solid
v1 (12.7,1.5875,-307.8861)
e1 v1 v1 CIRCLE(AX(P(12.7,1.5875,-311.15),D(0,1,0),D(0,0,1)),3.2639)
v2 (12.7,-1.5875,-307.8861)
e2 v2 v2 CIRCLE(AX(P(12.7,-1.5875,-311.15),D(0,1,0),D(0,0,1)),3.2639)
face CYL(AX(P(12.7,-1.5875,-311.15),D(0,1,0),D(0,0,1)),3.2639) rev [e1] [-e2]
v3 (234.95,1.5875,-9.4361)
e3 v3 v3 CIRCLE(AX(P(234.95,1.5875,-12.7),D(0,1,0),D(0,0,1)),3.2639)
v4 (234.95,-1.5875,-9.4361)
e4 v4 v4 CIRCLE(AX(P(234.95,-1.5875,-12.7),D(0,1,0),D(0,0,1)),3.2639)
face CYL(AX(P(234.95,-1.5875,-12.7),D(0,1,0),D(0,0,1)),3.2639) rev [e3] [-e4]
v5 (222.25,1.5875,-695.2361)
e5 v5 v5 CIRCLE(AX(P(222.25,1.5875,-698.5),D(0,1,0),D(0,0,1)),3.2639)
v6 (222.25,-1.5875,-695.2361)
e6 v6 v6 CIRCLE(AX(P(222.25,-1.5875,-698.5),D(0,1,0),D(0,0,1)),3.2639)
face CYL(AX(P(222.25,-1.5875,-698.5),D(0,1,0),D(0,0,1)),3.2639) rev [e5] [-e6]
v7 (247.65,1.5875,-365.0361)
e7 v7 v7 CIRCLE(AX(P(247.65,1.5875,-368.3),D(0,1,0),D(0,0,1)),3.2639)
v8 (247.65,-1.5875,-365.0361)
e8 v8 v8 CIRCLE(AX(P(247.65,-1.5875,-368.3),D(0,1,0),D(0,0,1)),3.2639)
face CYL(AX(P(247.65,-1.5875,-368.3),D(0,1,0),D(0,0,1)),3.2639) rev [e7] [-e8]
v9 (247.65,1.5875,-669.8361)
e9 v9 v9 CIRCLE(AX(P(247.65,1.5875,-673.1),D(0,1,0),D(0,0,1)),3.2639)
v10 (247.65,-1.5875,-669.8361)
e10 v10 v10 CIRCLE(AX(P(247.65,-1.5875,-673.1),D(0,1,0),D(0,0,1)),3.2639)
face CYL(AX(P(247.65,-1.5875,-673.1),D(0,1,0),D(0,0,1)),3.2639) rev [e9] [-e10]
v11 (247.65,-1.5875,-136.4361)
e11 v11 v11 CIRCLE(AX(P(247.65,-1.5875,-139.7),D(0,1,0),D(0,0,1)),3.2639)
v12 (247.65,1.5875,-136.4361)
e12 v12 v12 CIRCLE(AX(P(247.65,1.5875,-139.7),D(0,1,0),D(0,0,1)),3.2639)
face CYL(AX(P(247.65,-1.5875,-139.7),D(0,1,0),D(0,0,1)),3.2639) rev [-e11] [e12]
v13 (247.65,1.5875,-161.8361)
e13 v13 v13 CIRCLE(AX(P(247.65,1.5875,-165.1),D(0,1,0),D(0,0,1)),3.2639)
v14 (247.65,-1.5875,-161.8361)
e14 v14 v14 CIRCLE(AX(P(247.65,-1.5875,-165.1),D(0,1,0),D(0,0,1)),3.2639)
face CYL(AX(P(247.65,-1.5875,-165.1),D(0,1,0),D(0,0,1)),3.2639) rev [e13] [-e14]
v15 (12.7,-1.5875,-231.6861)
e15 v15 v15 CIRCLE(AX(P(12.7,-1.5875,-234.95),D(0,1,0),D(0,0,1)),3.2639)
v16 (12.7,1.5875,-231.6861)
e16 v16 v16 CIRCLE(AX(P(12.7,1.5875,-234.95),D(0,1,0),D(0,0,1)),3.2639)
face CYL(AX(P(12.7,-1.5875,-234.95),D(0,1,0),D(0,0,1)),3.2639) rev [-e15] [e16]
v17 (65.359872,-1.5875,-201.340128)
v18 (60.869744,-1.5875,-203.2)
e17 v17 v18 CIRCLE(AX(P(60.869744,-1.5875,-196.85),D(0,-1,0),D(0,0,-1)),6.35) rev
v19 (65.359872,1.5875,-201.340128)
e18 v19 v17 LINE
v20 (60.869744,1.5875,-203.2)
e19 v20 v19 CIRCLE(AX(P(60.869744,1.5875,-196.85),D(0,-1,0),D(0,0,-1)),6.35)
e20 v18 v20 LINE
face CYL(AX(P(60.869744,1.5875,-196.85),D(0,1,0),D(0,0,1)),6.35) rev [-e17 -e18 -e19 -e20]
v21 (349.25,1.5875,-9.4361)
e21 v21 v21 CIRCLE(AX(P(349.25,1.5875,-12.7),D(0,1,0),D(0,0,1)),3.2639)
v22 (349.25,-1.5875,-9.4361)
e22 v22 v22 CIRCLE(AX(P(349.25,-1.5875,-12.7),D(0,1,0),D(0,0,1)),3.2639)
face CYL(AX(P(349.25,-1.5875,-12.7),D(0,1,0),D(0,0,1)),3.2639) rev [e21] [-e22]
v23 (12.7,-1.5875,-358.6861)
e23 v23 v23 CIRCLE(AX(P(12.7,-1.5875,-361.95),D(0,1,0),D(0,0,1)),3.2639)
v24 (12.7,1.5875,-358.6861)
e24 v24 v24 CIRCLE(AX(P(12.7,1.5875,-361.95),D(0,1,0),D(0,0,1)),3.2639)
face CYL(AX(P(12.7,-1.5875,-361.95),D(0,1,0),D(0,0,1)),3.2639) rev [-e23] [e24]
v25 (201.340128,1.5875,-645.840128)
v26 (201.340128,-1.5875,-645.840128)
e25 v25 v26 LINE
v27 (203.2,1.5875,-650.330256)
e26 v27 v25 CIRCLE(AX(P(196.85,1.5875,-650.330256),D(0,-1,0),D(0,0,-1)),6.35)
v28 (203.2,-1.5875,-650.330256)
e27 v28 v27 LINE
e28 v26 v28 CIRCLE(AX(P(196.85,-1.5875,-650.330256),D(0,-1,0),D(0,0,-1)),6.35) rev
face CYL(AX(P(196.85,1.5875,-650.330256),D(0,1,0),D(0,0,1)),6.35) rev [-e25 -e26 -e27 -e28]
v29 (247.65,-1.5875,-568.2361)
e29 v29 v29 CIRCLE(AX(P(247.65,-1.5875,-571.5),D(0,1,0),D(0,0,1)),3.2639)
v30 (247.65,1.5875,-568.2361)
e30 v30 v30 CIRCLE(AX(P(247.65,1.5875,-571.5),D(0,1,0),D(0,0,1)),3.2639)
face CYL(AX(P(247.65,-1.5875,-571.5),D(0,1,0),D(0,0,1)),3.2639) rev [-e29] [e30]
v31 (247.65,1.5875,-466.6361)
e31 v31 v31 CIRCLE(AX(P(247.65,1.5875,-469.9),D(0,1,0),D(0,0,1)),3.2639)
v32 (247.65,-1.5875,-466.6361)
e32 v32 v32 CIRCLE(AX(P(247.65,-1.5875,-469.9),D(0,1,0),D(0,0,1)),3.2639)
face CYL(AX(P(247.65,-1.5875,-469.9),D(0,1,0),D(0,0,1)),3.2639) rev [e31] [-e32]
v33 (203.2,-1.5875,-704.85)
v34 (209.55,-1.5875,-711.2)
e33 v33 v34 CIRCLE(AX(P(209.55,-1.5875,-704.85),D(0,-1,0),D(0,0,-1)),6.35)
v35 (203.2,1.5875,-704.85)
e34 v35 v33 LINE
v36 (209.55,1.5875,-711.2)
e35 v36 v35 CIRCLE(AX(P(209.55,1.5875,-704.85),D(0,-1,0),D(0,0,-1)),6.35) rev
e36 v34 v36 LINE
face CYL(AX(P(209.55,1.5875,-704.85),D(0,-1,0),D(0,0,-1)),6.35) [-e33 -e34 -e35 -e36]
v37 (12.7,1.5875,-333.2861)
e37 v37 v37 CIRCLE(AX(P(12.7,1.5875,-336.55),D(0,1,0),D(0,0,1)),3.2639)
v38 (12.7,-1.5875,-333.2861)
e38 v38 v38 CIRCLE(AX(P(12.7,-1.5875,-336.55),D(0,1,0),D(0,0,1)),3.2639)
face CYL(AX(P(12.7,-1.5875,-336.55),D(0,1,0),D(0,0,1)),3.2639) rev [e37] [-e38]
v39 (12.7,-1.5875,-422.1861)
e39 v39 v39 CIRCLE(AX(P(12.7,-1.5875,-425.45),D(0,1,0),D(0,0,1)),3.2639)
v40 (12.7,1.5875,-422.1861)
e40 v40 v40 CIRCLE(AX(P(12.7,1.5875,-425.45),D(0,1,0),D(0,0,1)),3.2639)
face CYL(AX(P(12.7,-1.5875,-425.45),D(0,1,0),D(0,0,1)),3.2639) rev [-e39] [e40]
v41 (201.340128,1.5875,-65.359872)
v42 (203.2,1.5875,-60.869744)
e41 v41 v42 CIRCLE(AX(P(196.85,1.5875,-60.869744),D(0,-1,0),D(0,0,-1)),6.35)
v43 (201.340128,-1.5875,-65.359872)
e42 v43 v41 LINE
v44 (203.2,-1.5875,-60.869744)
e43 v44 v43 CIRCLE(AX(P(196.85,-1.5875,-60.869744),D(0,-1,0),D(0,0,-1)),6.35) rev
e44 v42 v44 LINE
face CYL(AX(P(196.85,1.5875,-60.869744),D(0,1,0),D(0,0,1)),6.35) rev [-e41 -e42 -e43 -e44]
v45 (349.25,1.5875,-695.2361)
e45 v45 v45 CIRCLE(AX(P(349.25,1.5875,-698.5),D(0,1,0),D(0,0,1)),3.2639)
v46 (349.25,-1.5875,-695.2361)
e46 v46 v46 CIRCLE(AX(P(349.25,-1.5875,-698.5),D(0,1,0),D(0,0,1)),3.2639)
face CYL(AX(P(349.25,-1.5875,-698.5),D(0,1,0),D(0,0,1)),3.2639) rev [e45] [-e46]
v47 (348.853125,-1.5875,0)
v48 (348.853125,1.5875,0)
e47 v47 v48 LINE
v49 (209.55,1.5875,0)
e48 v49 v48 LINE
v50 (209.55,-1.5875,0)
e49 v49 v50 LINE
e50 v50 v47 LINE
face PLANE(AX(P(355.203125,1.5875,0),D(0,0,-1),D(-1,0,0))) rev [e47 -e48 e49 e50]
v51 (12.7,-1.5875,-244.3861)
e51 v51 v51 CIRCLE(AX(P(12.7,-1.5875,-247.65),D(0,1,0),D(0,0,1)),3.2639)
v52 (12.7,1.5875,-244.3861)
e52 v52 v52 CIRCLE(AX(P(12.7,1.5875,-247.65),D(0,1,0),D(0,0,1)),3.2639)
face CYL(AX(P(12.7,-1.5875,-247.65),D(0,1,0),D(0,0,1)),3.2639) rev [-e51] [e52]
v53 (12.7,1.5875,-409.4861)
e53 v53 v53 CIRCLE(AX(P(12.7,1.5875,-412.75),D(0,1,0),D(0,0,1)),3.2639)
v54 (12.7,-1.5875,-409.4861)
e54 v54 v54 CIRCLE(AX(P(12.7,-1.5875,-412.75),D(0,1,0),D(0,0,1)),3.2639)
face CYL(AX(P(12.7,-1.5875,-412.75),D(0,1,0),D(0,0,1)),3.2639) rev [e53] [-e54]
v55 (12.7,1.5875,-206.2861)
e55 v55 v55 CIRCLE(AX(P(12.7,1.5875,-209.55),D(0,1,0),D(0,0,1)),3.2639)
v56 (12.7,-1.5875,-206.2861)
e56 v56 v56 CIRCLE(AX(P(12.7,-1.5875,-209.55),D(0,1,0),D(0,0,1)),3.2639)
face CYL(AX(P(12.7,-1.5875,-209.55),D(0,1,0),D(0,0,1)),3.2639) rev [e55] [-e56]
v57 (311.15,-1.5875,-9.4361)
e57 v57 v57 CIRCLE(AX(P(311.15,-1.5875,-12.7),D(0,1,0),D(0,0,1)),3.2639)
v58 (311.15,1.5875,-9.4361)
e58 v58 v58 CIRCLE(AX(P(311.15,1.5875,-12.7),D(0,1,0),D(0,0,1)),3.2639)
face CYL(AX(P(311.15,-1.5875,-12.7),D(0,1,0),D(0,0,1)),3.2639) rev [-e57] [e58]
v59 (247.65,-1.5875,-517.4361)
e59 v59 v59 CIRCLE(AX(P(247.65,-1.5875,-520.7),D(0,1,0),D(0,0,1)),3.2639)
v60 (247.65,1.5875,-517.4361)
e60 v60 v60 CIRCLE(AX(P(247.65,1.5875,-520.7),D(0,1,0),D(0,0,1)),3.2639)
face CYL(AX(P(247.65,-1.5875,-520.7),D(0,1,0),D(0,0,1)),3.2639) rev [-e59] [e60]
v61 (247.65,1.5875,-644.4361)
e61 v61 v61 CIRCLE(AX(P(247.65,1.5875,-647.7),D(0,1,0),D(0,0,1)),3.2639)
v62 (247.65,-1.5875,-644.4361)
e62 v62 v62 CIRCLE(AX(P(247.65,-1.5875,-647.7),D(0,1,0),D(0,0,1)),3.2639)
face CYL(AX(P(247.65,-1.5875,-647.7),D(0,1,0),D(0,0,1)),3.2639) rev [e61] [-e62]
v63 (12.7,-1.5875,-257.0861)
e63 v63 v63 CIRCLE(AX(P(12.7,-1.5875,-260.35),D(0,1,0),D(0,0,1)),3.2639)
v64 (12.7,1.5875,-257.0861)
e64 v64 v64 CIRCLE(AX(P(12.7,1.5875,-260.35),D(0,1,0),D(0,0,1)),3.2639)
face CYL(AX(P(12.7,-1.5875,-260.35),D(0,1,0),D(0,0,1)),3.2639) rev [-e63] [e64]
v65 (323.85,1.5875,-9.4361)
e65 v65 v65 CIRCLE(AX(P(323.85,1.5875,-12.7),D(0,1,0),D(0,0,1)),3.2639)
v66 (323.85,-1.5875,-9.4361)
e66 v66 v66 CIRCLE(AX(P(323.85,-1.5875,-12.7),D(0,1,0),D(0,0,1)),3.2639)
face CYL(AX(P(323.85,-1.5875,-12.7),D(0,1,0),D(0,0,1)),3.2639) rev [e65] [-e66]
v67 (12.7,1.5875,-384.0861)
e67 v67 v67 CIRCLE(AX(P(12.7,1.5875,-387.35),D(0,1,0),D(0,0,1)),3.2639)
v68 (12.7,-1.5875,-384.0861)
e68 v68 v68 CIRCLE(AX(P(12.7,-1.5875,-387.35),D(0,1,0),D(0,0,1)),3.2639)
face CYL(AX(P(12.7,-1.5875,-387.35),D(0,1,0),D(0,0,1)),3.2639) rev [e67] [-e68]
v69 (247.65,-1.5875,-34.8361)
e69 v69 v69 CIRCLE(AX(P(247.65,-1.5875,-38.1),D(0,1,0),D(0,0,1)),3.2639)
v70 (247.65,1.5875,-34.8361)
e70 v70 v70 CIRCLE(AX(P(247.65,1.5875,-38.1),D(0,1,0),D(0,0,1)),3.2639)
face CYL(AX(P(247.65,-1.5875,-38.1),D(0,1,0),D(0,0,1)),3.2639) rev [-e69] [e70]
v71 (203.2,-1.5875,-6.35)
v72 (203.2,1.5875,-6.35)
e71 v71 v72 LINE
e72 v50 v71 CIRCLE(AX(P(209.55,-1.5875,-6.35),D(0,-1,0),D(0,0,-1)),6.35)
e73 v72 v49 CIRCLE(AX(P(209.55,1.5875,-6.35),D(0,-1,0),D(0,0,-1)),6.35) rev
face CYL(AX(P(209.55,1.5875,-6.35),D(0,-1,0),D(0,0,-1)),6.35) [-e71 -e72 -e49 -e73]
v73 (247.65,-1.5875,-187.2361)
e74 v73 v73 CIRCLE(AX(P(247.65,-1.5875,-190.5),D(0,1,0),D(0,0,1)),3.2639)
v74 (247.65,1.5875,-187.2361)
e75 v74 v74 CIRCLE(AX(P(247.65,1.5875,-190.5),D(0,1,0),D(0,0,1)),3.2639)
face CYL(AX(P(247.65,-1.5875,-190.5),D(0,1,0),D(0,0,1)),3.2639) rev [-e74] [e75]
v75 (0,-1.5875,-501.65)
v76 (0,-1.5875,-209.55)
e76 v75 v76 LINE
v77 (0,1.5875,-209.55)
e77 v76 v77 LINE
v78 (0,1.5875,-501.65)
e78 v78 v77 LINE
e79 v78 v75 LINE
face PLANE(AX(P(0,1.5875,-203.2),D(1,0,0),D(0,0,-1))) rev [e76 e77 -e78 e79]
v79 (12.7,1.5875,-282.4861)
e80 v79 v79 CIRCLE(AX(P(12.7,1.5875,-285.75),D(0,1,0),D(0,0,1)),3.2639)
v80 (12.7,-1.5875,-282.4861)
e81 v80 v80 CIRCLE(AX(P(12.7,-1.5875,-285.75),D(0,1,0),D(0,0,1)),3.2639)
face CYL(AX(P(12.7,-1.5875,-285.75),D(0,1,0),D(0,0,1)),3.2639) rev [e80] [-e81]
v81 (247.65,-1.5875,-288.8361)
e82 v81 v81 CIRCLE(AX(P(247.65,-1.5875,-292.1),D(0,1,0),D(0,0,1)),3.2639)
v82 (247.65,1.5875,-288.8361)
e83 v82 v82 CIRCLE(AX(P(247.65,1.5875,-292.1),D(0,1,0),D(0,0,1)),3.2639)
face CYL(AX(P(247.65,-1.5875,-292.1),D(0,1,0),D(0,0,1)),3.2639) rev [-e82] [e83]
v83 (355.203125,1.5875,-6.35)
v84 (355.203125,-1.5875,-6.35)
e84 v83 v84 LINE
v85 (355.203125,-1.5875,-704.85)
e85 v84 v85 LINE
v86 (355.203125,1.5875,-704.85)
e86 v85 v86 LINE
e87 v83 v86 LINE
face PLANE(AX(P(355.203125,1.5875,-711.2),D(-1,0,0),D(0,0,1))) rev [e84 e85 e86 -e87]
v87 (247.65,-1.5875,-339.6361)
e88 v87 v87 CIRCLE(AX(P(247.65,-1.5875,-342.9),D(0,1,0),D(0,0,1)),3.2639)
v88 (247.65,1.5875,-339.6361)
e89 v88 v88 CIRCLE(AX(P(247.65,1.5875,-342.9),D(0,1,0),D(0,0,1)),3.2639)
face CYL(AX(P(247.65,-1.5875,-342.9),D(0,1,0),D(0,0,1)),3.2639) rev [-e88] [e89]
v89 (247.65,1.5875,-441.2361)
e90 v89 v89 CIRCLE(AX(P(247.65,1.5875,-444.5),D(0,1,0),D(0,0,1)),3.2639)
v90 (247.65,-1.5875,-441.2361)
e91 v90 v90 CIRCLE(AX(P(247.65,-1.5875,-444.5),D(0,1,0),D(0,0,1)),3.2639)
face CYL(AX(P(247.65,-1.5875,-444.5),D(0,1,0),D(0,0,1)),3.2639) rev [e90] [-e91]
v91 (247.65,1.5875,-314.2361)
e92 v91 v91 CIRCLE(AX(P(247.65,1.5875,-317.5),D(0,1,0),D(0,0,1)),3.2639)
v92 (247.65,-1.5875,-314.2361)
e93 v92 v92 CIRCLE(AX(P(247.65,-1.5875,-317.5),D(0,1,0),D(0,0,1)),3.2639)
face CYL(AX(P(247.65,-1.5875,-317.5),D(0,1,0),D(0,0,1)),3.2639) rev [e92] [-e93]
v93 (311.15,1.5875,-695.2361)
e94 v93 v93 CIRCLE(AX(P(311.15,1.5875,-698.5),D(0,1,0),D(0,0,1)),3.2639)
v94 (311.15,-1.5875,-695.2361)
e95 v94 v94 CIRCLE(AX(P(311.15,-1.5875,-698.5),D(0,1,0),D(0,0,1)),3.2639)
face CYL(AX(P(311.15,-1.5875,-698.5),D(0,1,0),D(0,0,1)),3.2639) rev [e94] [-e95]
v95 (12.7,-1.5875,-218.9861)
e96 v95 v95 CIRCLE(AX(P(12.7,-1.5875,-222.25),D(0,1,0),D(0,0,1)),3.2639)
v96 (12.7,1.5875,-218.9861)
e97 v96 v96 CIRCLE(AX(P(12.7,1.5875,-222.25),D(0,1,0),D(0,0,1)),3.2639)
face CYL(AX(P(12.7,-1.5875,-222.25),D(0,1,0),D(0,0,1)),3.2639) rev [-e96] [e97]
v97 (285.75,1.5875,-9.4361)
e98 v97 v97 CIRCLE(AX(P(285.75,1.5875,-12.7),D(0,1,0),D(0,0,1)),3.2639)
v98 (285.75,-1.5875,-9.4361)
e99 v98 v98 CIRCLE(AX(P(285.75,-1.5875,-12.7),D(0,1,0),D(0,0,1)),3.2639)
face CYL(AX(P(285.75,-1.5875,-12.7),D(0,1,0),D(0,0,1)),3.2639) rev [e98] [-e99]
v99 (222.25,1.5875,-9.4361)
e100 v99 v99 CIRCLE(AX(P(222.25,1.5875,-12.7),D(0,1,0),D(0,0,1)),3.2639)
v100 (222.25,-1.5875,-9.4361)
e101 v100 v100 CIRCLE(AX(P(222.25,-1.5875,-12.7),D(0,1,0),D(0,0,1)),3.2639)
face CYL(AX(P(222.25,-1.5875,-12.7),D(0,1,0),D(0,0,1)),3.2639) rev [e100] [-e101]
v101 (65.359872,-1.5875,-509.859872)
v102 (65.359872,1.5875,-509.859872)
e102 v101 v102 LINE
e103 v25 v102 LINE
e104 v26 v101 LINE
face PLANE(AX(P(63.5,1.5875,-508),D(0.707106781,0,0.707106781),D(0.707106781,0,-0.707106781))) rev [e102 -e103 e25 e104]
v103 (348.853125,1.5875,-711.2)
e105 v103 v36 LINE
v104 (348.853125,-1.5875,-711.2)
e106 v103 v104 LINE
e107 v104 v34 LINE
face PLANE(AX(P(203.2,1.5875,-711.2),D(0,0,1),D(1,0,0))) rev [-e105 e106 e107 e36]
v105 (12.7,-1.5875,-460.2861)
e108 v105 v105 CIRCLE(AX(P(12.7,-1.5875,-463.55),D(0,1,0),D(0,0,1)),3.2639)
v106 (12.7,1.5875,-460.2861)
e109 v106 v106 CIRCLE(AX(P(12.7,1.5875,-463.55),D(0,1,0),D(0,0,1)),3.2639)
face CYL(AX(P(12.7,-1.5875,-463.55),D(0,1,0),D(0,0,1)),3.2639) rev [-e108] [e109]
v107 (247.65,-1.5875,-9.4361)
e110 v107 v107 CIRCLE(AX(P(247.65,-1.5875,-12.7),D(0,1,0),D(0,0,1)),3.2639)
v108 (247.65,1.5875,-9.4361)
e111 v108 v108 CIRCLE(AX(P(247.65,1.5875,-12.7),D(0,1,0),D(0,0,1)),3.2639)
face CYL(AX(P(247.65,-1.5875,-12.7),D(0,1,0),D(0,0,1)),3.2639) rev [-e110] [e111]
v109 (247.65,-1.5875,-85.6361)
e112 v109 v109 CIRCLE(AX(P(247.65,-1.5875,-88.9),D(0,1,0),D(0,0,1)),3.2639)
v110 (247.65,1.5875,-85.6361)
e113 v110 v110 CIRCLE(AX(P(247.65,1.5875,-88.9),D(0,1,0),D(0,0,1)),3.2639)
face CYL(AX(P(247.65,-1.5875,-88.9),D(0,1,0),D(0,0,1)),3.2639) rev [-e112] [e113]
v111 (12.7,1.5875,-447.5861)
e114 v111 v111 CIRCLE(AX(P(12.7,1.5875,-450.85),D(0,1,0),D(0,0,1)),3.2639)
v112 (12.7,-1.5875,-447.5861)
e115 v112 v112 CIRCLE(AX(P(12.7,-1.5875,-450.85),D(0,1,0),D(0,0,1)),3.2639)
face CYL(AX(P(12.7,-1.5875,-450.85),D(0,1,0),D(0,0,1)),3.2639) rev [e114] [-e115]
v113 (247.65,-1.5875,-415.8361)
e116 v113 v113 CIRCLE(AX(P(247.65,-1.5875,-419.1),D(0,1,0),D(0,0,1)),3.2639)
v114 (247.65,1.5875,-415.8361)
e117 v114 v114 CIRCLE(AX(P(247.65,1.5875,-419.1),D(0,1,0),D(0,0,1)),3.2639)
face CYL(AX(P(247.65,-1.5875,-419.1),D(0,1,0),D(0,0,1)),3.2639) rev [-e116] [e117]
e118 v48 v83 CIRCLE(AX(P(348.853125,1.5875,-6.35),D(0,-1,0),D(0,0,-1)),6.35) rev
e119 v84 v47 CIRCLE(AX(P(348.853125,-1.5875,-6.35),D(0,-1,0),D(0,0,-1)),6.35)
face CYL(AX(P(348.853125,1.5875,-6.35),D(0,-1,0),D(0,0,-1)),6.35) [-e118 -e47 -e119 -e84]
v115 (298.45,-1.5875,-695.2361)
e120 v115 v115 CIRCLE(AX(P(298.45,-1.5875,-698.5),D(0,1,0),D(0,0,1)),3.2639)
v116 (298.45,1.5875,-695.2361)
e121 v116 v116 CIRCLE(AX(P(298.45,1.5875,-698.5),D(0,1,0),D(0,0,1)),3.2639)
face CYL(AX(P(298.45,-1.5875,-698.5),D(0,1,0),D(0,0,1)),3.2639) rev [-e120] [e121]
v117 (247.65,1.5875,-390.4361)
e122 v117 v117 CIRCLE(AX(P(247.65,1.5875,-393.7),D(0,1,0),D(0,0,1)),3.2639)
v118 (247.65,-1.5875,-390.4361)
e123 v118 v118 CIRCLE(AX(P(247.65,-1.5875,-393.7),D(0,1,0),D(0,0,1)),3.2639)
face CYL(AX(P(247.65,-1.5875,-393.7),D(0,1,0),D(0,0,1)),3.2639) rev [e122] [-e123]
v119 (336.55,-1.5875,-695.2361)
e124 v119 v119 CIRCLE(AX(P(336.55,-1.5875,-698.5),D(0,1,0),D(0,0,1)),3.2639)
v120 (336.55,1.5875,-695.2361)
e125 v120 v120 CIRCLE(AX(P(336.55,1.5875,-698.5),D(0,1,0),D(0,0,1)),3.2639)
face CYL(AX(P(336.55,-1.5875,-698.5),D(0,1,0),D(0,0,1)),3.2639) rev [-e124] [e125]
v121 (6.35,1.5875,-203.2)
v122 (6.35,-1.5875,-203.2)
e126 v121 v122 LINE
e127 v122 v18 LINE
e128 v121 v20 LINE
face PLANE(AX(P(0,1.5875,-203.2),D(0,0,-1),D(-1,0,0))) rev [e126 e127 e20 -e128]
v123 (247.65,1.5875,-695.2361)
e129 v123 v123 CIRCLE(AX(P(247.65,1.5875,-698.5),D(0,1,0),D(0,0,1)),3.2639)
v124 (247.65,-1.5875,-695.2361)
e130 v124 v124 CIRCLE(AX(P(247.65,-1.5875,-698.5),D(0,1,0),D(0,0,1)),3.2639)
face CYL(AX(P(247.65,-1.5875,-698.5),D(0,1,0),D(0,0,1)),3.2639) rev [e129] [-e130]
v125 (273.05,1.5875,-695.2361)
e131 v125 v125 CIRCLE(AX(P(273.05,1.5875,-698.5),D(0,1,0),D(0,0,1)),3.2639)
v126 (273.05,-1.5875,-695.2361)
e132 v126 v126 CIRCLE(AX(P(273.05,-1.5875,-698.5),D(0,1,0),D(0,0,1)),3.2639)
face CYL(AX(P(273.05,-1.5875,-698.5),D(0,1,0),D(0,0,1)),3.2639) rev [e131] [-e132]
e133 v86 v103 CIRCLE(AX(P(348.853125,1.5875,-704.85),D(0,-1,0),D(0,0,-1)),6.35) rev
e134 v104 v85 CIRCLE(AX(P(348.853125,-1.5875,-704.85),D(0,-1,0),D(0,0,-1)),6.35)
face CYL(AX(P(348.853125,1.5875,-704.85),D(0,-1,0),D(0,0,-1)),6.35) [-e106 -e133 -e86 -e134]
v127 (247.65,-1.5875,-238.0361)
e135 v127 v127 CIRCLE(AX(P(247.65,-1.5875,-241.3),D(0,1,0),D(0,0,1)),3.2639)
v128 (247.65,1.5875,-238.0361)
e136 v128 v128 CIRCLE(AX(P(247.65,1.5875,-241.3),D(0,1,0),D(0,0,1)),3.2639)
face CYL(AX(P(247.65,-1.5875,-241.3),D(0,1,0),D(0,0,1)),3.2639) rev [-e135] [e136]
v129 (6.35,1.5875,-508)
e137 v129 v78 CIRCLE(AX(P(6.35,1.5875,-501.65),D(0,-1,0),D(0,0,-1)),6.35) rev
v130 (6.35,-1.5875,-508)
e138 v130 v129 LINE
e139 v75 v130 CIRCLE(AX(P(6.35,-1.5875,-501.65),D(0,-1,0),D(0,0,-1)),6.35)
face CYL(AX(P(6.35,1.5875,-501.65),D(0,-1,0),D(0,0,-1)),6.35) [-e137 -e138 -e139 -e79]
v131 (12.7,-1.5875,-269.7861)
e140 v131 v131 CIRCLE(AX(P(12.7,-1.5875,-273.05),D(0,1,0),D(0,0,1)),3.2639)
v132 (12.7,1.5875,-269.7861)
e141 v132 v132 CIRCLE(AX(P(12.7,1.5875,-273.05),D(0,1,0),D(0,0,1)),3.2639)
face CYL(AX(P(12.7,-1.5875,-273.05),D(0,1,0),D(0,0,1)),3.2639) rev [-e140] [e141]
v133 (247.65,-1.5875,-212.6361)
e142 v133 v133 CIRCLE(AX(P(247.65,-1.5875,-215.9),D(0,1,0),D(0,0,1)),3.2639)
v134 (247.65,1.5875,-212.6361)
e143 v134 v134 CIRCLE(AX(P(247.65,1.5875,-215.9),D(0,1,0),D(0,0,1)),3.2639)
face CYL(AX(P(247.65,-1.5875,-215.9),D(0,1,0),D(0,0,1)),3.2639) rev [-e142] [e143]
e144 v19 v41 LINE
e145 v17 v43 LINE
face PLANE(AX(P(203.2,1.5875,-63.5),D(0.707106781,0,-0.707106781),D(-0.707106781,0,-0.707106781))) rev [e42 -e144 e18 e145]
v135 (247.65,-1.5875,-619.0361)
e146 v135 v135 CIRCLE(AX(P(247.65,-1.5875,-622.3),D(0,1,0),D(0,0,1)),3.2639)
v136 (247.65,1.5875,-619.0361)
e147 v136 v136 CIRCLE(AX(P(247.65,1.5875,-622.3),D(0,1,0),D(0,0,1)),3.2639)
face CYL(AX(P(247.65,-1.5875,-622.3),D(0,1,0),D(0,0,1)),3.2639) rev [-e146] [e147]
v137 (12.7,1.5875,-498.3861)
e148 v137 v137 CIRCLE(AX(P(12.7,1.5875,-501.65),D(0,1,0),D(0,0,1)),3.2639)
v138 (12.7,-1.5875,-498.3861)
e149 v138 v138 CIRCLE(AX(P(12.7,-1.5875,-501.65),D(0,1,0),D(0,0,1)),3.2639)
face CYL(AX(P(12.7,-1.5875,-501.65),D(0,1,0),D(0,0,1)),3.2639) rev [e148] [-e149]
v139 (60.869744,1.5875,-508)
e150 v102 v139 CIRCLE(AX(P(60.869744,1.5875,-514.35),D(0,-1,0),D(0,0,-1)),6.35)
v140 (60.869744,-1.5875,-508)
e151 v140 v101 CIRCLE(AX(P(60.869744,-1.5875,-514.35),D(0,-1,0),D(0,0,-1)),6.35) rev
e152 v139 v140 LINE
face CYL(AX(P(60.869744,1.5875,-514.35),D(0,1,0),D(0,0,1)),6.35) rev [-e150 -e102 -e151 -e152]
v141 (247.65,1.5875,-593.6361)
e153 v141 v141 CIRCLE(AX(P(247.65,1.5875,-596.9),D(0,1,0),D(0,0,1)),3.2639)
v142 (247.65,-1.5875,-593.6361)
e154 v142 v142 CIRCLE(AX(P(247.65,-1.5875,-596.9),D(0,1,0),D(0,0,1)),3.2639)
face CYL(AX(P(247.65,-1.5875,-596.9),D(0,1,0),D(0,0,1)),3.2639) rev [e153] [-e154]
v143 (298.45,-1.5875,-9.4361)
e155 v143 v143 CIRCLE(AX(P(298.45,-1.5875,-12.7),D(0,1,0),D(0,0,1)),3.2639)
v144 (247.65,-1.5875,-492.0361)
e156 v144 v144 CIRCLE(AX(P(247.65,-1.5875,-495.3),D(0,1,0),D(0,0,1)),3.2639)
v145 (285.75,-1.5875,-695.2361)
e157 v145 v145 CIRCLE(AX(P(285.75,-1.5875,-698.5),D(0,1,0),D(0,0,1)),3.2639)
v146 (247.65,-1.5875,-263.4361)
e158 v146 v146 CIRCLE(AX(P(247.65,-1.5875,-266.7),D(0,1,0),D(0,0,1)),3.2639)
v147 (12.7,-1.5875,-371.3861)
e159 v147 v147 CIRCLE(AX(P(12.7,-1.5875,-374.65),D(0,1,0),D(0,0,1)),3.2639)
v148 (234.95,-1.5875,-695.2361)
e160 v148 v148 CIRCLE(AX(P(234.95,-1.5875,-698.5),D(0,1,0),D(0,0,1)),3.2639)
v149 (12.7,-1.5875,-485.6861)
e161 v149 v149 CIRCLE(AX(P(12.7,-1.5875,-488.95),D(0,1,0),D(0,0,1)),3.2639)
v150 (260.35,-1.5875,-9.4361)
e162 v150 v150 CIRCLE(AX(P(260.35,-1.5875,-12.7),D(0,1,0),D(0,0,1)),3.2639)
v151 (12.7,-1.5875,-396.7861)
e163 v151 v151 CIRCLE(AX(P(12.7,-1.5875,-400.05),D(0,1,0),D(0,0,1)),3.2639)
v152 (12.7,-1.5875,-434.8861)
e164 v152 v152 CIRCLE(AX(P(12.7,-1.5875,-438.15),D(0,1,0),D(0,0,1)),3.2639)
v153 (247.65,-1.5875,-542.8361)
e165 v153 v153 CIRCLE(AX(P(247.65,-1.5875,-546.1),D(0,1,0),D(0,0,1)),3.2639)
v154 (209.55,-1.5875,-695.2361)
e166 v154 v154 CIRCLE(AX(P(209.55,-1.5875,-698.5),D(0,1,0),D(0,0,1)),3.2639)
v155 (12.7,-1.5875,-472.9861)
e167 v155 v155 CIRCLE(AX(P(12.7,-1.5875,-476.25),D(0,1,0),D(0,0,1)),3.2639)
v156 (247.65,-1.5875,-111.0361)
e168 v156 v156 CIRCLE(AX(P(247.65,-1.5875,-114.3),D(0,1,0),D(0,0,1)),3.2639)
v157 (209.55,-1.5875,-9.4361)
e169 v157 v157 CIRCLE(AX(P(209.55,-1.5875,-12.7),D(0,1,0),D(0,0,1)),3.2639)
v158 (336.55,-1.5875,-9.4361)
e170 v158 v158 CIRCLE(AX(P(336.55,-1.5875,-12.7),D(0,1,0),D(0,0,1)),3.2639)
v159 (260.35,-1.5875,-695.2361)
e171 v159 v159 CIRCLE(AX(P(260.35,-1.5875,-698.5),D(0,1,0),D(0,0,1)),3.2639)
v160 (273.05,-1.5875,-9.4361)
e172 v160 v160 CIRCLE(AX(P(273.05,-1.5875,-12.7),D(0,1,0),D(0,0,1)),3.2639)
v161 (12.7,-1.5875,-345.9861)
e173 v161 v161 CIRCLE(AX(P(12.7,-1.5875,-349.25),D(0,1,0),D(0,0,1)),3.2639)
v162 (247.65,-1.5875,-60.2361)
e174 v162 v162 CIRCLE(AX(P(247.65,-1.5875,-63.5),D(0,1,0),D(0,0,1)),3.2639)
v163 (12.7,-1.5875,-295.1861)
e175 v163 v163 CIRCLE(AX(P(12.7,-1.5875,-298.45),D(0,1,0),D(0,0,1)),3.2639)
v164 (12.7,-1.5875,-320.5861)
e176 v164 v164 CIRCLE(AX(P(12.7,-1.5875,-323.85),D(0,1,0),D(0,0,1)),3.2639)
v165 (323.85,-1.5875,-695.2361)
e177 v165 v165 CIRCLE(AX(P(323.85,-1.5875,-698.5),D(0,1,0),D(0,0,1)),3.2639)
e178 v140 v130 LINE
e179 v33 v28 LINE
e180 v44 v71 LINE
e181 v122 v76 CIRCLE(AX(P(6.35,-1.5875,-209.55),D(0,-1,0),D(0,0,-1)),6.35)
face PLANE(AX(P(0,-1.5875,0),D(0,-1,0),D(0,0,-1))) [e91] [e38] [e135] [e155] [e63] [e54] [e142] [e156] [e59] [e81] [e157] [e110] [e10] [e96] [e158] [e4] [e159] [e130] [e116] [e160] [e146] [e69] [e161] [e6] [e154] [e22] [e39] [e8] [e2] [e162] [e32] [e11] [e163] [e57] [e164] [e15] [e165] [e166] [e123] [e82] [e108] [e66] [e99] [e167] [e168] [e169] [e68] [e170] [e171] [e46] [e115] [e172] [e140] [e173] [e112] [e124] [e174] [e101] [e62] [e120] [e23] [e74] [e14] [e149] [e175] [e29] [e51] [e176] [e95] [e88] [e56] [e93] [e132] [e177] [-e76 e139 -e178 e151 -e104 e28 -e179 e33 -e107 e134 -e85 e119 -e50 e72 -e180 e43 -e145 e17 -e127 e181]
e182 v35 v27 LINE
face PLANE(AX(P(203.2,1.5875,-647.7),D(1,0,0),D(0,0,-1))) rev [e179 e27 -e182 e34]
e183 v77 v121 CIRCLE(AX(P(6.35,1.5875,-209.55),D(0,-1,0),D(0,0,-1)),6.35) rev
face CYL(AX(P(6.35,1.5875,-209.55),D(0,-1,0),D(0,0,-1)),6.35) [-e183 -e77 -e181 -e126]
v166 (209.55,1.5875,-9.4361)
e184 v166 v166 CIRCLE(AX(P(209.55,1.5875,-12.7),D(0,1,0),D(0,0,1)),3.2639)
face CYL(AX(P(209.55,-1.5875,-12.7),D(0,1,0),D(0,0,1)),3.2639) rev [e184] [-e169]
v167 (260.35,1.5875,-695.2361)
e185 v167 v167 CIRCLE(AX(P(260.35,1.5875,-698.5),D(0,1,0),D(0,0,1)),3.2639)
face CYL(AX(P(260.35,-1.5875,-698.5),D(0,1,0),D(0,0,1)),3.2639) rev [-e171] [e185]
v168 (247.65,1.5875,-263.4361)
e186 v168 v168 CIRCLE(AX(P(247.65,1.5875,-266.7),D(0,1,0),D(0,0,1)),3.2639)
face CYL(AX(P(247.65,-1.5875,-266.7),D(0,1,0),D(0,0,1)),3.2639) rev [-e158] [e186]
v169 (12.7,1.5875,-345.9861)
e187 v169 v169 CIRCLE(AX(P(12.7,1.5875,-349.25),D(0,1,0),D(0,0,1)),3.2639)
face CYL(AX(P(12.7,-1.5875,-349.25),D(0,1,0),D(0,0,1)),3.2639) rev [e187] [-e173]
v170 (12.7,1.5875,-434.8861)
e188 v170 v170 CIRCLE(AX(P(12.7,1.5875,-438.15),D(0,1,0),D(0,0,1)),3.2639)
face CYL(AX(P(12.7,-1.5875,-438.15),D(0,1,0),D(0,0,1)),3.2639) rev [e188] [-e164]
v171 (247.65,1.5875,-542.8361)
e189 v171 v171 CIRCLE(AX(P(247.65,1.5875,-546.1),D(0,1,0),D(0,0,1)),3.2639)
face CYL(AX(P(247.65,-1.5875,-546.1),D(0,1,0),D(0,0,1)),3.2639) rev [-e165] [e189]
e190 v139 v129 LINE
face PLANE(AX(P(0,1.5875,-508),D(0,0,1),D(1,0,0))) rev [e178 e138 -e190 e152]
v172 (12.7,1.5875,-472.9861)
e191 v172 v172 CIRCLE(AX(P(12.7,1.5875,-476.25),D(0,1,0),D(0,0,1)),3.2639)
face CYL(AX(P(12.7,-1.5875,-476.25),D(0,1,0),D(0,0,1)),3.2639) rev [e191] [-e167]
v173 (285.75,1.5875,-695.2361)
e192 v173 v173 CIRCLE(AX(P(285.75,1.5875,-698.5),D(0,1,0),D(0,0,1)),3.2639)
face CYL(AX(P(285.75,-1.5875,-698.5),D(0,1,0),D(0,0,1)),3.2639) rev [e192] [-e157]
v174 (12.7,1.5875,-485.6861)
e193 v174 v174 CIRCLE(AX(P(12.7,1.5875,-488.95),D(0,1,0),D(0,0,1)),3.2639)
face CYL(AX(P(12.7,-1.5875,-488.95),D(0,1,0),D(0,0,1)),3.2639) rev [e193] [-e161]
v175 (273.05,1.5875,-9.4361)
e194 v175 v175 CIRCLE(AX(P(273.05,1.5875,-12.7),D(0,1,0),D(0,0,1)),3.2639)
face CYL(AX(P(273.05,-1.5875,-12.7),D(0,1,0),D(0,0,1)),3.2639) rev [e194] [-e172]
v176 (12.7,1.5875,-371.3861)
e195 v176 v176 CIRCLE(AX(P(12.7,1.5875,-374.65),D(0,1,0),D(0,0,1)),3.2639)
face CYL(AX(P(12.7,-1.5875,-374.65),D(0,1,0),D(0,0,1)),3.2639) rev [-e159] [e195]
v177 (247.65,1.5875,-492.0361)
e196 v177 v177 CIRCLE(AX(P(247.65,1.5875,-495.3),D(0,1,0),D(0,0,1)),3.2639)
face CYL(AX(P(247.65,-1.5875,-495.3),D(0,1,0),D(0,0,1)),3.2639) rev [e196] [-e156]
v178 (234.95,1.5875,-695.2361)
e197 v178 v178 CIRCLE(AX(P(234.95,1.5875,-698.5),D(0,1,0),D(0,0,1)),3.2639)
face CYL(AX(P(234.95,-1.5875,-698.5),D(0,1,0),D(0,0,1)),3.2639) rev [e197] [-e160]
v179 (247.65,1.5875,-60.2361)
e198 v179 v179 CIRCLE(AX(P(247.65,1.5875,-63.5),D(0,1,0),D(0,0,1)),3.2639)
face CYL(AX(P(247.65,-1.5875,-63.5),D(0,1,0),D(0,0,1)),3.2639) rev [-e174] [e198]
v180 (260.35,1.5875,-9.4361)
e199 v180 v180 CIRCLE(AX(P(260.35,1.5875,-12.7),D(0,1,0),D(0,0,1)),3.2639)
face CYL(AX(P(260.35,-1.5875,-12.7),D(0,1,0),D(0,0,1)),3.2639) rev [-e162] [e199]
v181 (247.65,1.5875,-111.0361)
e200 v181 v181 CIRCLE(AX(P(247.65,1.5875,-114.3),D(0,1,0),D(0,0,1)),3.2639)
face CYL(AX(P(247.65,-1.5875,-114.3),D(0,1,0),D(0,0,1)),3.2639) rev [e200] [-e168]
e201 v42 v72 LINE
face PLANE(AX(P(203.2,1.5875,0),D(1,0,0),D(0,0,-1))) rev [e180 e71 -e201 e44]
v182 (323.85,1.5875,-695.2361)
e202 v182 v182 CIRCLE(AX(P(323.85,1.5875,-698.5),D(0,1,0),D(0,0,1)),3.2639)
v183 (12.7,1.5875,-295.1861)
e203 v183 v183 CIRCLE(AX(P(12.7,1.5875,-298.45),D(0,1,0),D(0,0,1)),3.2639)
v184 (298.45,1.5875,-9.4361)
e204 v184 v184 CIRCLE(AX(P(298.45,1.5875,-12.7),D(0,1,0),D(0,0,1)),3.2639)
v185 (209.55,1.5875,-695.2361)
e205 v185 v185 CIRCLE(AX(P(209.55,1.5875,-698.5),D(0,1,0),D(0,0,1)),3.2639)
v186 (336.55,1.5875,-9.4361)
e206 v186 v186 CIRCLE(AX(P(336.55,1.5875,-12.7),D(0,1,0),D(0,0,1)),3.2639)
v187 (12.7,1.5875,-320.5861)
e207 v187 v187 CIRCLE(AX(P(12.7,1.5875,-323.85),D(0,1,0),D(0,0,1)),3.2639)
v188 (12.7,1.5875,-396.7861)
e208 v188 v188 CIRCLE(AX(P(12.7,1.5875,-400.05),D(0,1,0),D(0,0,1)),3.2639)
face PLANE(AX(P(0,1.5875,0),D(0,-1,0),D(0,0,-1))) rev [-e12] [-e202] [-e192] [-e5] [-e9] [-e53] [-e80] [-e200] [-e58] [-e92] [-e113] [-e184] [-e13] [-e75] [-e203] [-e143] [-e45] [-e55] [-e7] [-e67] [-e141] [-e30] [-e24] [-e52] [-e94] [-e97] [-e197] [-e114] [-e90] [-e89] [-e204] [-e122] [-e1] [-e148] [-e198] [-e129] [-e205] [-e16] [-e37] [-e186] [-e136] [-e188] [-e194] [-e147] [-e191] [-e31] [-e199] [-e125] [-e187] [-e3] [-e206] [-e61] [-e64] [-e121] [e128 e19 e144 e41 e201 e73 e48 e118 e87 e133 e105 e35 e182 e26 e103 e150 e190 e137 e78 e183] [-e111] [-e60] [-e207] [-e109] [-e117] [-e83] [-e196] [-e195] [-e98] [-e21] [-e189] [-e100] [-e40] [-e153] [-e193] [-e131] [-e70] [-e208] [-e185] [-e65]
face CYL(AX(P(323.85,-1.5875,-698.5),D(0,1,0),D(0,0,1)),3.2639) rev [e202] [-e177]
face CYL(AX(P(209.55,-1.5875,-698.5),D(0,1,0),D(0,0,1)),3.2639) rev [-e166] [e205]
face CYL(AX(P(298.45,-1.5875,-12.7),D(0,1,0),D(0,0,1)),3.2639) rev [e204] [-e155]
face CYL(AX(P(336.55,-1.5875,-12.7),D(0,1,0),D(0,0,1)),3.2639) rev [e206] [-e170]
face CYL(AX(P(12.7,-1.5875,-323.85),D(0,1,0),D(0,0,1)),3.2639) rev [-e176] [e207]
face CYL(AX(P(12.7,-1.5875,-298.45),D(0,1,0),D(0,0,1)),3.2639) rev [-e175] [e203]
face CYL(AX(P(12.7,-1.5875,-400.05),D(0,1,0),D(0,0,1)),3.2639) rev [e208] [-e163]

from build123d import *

# Parameters (mm, degrees)
BOSS_EXTRUDE2_DEPTH = 1.5875
SKETCH2_R           = 3.2639
CUT_EXTRUDE1_DEPTH  = 795.974704399
FILLET1_R           = 6.35
LPATTERN1_START     = -1.5875
LPATTERN1_OUTLINE_R = 3.2639
LPATTERN1_DEPTH     = 3.175
LPATTERN2_START     = -1.5875
LPATTERN2_OUTLINE_R = 3.2639
LPATTERN2_DEPTH     = 3.175
SKETCH3_R           = 3.2639
CUT_EXTRUDE2_DEPTH  = 795.974704399


# Read off the part's stored shape, not the designer's step: LPattern1, LPattern2
with BuildPart() as part:
    # Sketch1 → Boss-Extrude2 (new, symmetric)
    with BuildSketch(Plane(origin=(0, 0, 0), x_dir=(1, 0, 0), z_dir=(0, 1, 0))):
        Polygon((0, 203.2), (63.5, 203.2), (133.096984938, 133.603015062), (203.2, 63.5), (203.2, 0), (355.203125, 0), (355.203125, 711.2), (203.2, 711.2), (203.2, 647.7), (63.5, 508), (0, 508), align=None)
    extrude(amount=BOSS_EXTRUDE2_DEPTH, both=True)

    # Sketch2 → Cut-Extrude1 (cut, through all)
    with BuildSketch(Plane(origin=(0, 1.5875, 0), x_dir=(1, 0, 0), z_dir=(0, 1, 0))):
        with Locations(Location((209.55, 698.5, 0), (0, 0, 270))):
            Circle(SKETCH2_R)
        with Locations(Location((12.7, 501.65, 0), (0, 0, 270))):
            Circle(SKETCH2_R)
        with Locations(Location((209.55, 12.7, 0), (0, 0, 270))):
            Circle(SKETCH2_R)
    extrude(amount=-CUT_EXTRUDE1_DEPTH, mode=Mode.SUBTRACT)

    # Fillet1
    fillet1_edges = [part.edges().sort_by_distance(p)[0] for p in [
        (0, 0, -508),
        (63.5, 0, -508),
        (203.2, 0, -647.7),
        (203.2, 0, -711.2),
        (355.203125, 0, -711.2),
        (355.203125, 0, 0),
        (203.2, 0, 0),
        (203.2, 0, -63.5),
        (63.5, 0, -203.2),
        (0, 0, -203.2),
    ]]
    fillet(fillet1_edges, radius=FILLET1_R)

    # LPattern1 outline → LPattern1 (cut)
    with BuildSketch(Plane(origin=(0, 0, 0), x_dir=(1, 0, 0), z_dir=(0, 1, 0)).offset(LPATTERN1_START)):
        with Locations((12.7, 209.55)):
            Circle(LPATTERN1_OUTLINE_R)
        with Locations((12.7, 222.25)):
            Circle(LPATTERN1_OUTLINE_R)
        with Locations((12.7, 234.95)):
            Circle(LPATTERN1_OUTLINE_R)
        with Locations((12.7, 247.65)):
            Circle(LPATTERN1_OUTLINE_R)
        with Locations((12.7, 260.35)):
            Circle(LPATTERN1_OUTLINE_R)
        with Locations((12.7, 273.05)):
            Circle(LPATTERN1_OUTLINE_R)
        with Locations((12.7, 285.75)):
            Circle(LPATTERN1_OUTLINE_R)
        with Locations((12.7, 298.45)):
            Circle(LPATTERN1_OUTLINE_R)
        with Locations((12.7, 311.15)):
            Circle(LPATTERN1_OUTLINE_R)
        with Locations((12.7, 323.85)):
            Circle(LPATTERN1_OUTLINE_R)
        with Locations((12.7, 336.55)):
            Circle(LPATTERN1_OUTLINE_R)
        with Locations((12.7, 349.25)):
            Circle(LPATTERN1_OUTLINE_R)
        with Locations((12.7, 361.95)):
            Circle(LPATTERN1_OUTLINE_R)
        with Locations((12.7, 374.65)):
            Circle(LPATTERN1_OUTLINE_R)
        with Locations((12.7, 387.35)):
            Circle(LPATTERN1_OUTLINE_R)
        with Locations((12.7, 400.05)):
            Circle(LPATTERN1_OUTLINE_R)
        with Locations((12.7, 412.75)):
            Circle(LPATTERN1_OUTLINE_R)
        with Locations((12.7, 425.45)):
            Circle(LPATTERN1_OUTLINE_R)
        with Locations((12.7, 438.15)):
            Circle(LPATTERN1_OUTLINE_R)
        with Locations((12.7, 450.85)):
            Circle(LPATTERN1_OUTLINE_R)
        with Locations((12.7, 463.55)):
            Circle(LPATTERN1_OUTLINE_R)
        with Locations((12.7, 476.25)):
            Circle(LPATTERN1_OUTLINE_R)
        with Locations((12.7, 488.95)):
            Circle(LPATTERN1_OUTLINE_R)
    extrude(amount=LPATTERN1_DEPTH, mode=Mode.SUBTRACT)

    # LPattern2 outline → LPattern2 (cut)
    with BuildSketch(Plane(origin=(0, 0, 0), x_dir=(1, 0, 0), z_dir=(0, 1, 0)).offset(LPATTERN2_START)):
        with Locations((349.25, 12.7)):
            Circle(LPATTERN2_OUTLINE_R)
        with Locations((349.25, 698.5)):
            Circle(LPATTERN2_OUTLINE_R)
        with Locations((336.55, 12.7)):
            Circle(LPATTERN2_OUTLINE_R)
        with Locations((336.55, 698.5)):
            Circle(LPATTERN2_OUTLINE_R)
        with Locations((323.85, 12.7)):
            Circle(LPATTERN2_OUTLINE_R)
        with Locations((323.85, 698.5)):
            Circle(LPATTERN2_OUTLINE_R)
        with Locations((311.15, 12.7)):
            Circle(LPATTERN2_OUTLINE_R)
        with Locations((311.15, 698.5)):
            Circle(LPATTERN2_OUTLINE_R)
        with Locations((298.45, 12.7)):
            Circle(LPATTERN2_OUTLINE_R)
        with Locations((298.45, 698.5)):
            Circle(LPATTERN2_OUTLINE_R)
        with Locations((285.75, 12.7)):
            Circle(LPATTERN2_OUTLINE_R)
        with Locations((285.75, 698.5)):
            Circle(LPATTERN2_OUTLINE_R)
        with Locations((273.05, 12.7)):
            Circle(LPATTERN2_OUTLINE_R)
        with Locations((273.05, 698.5)):
            Circle(LPATTERN2_OUTLINE_R)
        with Locations((260.35, 12.7)):
            Circle(LPATTERN2_OUTLINE_R)
        with Locations((260.35, 698.5)):
            Circle(LPATTERN2_OUTLINE_R)
        with Locations((247.65, 12.7)):
            Circle(LPATTERN2_OUTLINE_R)
        with Locations((247.65, 698.5)):
            Circle(LPATTERN2_OUTLINE_R)
        with Locations((234.95, 12.7)):
            Circle(LPATTERN2_OUTLINE_R)
        with Locations((234.95, 698.5)):
            Circle(LPATTERN2_OUTLINE_R)
        with Locations((222.25, 12.7)):
            Circle(LPATTERN2_OUTLINE_R)
        with Locations((222.25, 698.5)):
            Circle(LPATTERN2_OUTLINE_R)
    extrude(amount=LPATTERN2_DEPTH, mode=Mode.SUBTRACT)

    # Sketch3 → Cut-Extrude2 (cut, through all)
    with BuildSketch(Plane(origin=(0, 1.5875, 0), x_dir=(1, 0, 0), z_dir=(0, 1, 0))):
        with Locations(Location((247.65, 698.5, 0), (0, 0, 270))):
            Circle(SKETCH3_R)
        with Locations(Location((247.65, 673.1, 0), (0, 0, 270))):
            Circle(SKETCH3_R)
        with Locations(Location((247.65, 647.7, 0), (0, 0, 270))):
            Circle(SKETCH3_R)
        with Locations(Location((247.65, 622.3, 0), (0, 0, 270))):
            Circle(SKETCH3_R)
        with Locations(Location((247.65, 596.9, 0), (0, 0, 270))):
            Circle(SKETCH3_R)
        with Locations(Location((247.65, 571.5, 0), (0, 0, 270))):
            Circle(SKETCH3_R)
        with Locations(Location((247.65, 546.1, 0), (0, 0, 270))):
            Circle(SKETCH3_R)
        with Locations(Location((247.65, 520.7, 0), (0, 0, 270))):
            Circle(SKETCH3_R)
        with Locations(Location((247.65, 495.3, 0), (0, 0, 270))):
            Circle(SKETCH3_R)
        with Locations(Location((247.65, 469.9, 0), (0, 0, 270))):
            Circle(SKETCH3_R)
        with Locations(Location((247.65, 444.5, 0), (0, 0, 270))):
            Circle(SKETCH3_R)
        with Locations(Location((247.65, 419.1, 0), (0, 0, 270))):
            Circle(SKETCH3_R)
        with Locations(Location((247.65, 393.7, 0), (0, 0, 270))):
            Circle(SKETCH3_R)
        with Locations(Location((247.65, 368.3, 0), (0, 0, 270))):
            Circle(SKETCH3_R)
        with Locations(Location((247.65, 342.9, 0), (0, 0, 270))):
            Circle(SKETCH3_R)
        with Locations(Location((247.65, 317.5, 0), (0, 0, 270))):
            Circle(SKETCH3_R)
        with Locations(Location((247.65, 292.1, 0), (0, 0, 270))):
            Circle(SKETCH3_R)
        with Locations(Location((247.65, 266.7, 0), (0, 0, 270))):
            Circle(SKETCH3_R)
        with Locations(Location((247.65, 241.3, 0), (0, 0, 270))):
            Circle(SKETCH3_R)
        with Locations(Location((247.65, 215.9, 0), (0, 0, 270))):
            Circle(SKETCH3_R)
        with Locations(Location((247.65, 190.5, 0), (0, 0, 270))):
            Circle(SKETCH3_R)
        with Locations(Location((247.65, 165.1, 0), (0, 0, 270))):
            Circle(SKETCH3_R)
        with Locations(Location((247.65, 139.7, 0), (0, 0, 270))):
            Circle(SKETCH3_R)
        with Locations(Location((247.65, 114.3, 0), (0, 0, 270))):
            Circle(SKETCH3_R)
        with Locations(Location((247.65, 88.9, 0), (0, 0, 270))):
            Circle(SKETCH3_R)
        with Locations(Location((247.65, 63.5, 0), (0, 0, 270))):
            Circle(SKETCH3_R)
        with Locations(Location((247.65, 38.1, 0), (0, 0, 270))):
            Circle(SKETCH3_R)
    extrude(amount=-CUT_EXTRUDE2_DEPTH, mode=Mode.SUBTRACT)


solid = part.part
